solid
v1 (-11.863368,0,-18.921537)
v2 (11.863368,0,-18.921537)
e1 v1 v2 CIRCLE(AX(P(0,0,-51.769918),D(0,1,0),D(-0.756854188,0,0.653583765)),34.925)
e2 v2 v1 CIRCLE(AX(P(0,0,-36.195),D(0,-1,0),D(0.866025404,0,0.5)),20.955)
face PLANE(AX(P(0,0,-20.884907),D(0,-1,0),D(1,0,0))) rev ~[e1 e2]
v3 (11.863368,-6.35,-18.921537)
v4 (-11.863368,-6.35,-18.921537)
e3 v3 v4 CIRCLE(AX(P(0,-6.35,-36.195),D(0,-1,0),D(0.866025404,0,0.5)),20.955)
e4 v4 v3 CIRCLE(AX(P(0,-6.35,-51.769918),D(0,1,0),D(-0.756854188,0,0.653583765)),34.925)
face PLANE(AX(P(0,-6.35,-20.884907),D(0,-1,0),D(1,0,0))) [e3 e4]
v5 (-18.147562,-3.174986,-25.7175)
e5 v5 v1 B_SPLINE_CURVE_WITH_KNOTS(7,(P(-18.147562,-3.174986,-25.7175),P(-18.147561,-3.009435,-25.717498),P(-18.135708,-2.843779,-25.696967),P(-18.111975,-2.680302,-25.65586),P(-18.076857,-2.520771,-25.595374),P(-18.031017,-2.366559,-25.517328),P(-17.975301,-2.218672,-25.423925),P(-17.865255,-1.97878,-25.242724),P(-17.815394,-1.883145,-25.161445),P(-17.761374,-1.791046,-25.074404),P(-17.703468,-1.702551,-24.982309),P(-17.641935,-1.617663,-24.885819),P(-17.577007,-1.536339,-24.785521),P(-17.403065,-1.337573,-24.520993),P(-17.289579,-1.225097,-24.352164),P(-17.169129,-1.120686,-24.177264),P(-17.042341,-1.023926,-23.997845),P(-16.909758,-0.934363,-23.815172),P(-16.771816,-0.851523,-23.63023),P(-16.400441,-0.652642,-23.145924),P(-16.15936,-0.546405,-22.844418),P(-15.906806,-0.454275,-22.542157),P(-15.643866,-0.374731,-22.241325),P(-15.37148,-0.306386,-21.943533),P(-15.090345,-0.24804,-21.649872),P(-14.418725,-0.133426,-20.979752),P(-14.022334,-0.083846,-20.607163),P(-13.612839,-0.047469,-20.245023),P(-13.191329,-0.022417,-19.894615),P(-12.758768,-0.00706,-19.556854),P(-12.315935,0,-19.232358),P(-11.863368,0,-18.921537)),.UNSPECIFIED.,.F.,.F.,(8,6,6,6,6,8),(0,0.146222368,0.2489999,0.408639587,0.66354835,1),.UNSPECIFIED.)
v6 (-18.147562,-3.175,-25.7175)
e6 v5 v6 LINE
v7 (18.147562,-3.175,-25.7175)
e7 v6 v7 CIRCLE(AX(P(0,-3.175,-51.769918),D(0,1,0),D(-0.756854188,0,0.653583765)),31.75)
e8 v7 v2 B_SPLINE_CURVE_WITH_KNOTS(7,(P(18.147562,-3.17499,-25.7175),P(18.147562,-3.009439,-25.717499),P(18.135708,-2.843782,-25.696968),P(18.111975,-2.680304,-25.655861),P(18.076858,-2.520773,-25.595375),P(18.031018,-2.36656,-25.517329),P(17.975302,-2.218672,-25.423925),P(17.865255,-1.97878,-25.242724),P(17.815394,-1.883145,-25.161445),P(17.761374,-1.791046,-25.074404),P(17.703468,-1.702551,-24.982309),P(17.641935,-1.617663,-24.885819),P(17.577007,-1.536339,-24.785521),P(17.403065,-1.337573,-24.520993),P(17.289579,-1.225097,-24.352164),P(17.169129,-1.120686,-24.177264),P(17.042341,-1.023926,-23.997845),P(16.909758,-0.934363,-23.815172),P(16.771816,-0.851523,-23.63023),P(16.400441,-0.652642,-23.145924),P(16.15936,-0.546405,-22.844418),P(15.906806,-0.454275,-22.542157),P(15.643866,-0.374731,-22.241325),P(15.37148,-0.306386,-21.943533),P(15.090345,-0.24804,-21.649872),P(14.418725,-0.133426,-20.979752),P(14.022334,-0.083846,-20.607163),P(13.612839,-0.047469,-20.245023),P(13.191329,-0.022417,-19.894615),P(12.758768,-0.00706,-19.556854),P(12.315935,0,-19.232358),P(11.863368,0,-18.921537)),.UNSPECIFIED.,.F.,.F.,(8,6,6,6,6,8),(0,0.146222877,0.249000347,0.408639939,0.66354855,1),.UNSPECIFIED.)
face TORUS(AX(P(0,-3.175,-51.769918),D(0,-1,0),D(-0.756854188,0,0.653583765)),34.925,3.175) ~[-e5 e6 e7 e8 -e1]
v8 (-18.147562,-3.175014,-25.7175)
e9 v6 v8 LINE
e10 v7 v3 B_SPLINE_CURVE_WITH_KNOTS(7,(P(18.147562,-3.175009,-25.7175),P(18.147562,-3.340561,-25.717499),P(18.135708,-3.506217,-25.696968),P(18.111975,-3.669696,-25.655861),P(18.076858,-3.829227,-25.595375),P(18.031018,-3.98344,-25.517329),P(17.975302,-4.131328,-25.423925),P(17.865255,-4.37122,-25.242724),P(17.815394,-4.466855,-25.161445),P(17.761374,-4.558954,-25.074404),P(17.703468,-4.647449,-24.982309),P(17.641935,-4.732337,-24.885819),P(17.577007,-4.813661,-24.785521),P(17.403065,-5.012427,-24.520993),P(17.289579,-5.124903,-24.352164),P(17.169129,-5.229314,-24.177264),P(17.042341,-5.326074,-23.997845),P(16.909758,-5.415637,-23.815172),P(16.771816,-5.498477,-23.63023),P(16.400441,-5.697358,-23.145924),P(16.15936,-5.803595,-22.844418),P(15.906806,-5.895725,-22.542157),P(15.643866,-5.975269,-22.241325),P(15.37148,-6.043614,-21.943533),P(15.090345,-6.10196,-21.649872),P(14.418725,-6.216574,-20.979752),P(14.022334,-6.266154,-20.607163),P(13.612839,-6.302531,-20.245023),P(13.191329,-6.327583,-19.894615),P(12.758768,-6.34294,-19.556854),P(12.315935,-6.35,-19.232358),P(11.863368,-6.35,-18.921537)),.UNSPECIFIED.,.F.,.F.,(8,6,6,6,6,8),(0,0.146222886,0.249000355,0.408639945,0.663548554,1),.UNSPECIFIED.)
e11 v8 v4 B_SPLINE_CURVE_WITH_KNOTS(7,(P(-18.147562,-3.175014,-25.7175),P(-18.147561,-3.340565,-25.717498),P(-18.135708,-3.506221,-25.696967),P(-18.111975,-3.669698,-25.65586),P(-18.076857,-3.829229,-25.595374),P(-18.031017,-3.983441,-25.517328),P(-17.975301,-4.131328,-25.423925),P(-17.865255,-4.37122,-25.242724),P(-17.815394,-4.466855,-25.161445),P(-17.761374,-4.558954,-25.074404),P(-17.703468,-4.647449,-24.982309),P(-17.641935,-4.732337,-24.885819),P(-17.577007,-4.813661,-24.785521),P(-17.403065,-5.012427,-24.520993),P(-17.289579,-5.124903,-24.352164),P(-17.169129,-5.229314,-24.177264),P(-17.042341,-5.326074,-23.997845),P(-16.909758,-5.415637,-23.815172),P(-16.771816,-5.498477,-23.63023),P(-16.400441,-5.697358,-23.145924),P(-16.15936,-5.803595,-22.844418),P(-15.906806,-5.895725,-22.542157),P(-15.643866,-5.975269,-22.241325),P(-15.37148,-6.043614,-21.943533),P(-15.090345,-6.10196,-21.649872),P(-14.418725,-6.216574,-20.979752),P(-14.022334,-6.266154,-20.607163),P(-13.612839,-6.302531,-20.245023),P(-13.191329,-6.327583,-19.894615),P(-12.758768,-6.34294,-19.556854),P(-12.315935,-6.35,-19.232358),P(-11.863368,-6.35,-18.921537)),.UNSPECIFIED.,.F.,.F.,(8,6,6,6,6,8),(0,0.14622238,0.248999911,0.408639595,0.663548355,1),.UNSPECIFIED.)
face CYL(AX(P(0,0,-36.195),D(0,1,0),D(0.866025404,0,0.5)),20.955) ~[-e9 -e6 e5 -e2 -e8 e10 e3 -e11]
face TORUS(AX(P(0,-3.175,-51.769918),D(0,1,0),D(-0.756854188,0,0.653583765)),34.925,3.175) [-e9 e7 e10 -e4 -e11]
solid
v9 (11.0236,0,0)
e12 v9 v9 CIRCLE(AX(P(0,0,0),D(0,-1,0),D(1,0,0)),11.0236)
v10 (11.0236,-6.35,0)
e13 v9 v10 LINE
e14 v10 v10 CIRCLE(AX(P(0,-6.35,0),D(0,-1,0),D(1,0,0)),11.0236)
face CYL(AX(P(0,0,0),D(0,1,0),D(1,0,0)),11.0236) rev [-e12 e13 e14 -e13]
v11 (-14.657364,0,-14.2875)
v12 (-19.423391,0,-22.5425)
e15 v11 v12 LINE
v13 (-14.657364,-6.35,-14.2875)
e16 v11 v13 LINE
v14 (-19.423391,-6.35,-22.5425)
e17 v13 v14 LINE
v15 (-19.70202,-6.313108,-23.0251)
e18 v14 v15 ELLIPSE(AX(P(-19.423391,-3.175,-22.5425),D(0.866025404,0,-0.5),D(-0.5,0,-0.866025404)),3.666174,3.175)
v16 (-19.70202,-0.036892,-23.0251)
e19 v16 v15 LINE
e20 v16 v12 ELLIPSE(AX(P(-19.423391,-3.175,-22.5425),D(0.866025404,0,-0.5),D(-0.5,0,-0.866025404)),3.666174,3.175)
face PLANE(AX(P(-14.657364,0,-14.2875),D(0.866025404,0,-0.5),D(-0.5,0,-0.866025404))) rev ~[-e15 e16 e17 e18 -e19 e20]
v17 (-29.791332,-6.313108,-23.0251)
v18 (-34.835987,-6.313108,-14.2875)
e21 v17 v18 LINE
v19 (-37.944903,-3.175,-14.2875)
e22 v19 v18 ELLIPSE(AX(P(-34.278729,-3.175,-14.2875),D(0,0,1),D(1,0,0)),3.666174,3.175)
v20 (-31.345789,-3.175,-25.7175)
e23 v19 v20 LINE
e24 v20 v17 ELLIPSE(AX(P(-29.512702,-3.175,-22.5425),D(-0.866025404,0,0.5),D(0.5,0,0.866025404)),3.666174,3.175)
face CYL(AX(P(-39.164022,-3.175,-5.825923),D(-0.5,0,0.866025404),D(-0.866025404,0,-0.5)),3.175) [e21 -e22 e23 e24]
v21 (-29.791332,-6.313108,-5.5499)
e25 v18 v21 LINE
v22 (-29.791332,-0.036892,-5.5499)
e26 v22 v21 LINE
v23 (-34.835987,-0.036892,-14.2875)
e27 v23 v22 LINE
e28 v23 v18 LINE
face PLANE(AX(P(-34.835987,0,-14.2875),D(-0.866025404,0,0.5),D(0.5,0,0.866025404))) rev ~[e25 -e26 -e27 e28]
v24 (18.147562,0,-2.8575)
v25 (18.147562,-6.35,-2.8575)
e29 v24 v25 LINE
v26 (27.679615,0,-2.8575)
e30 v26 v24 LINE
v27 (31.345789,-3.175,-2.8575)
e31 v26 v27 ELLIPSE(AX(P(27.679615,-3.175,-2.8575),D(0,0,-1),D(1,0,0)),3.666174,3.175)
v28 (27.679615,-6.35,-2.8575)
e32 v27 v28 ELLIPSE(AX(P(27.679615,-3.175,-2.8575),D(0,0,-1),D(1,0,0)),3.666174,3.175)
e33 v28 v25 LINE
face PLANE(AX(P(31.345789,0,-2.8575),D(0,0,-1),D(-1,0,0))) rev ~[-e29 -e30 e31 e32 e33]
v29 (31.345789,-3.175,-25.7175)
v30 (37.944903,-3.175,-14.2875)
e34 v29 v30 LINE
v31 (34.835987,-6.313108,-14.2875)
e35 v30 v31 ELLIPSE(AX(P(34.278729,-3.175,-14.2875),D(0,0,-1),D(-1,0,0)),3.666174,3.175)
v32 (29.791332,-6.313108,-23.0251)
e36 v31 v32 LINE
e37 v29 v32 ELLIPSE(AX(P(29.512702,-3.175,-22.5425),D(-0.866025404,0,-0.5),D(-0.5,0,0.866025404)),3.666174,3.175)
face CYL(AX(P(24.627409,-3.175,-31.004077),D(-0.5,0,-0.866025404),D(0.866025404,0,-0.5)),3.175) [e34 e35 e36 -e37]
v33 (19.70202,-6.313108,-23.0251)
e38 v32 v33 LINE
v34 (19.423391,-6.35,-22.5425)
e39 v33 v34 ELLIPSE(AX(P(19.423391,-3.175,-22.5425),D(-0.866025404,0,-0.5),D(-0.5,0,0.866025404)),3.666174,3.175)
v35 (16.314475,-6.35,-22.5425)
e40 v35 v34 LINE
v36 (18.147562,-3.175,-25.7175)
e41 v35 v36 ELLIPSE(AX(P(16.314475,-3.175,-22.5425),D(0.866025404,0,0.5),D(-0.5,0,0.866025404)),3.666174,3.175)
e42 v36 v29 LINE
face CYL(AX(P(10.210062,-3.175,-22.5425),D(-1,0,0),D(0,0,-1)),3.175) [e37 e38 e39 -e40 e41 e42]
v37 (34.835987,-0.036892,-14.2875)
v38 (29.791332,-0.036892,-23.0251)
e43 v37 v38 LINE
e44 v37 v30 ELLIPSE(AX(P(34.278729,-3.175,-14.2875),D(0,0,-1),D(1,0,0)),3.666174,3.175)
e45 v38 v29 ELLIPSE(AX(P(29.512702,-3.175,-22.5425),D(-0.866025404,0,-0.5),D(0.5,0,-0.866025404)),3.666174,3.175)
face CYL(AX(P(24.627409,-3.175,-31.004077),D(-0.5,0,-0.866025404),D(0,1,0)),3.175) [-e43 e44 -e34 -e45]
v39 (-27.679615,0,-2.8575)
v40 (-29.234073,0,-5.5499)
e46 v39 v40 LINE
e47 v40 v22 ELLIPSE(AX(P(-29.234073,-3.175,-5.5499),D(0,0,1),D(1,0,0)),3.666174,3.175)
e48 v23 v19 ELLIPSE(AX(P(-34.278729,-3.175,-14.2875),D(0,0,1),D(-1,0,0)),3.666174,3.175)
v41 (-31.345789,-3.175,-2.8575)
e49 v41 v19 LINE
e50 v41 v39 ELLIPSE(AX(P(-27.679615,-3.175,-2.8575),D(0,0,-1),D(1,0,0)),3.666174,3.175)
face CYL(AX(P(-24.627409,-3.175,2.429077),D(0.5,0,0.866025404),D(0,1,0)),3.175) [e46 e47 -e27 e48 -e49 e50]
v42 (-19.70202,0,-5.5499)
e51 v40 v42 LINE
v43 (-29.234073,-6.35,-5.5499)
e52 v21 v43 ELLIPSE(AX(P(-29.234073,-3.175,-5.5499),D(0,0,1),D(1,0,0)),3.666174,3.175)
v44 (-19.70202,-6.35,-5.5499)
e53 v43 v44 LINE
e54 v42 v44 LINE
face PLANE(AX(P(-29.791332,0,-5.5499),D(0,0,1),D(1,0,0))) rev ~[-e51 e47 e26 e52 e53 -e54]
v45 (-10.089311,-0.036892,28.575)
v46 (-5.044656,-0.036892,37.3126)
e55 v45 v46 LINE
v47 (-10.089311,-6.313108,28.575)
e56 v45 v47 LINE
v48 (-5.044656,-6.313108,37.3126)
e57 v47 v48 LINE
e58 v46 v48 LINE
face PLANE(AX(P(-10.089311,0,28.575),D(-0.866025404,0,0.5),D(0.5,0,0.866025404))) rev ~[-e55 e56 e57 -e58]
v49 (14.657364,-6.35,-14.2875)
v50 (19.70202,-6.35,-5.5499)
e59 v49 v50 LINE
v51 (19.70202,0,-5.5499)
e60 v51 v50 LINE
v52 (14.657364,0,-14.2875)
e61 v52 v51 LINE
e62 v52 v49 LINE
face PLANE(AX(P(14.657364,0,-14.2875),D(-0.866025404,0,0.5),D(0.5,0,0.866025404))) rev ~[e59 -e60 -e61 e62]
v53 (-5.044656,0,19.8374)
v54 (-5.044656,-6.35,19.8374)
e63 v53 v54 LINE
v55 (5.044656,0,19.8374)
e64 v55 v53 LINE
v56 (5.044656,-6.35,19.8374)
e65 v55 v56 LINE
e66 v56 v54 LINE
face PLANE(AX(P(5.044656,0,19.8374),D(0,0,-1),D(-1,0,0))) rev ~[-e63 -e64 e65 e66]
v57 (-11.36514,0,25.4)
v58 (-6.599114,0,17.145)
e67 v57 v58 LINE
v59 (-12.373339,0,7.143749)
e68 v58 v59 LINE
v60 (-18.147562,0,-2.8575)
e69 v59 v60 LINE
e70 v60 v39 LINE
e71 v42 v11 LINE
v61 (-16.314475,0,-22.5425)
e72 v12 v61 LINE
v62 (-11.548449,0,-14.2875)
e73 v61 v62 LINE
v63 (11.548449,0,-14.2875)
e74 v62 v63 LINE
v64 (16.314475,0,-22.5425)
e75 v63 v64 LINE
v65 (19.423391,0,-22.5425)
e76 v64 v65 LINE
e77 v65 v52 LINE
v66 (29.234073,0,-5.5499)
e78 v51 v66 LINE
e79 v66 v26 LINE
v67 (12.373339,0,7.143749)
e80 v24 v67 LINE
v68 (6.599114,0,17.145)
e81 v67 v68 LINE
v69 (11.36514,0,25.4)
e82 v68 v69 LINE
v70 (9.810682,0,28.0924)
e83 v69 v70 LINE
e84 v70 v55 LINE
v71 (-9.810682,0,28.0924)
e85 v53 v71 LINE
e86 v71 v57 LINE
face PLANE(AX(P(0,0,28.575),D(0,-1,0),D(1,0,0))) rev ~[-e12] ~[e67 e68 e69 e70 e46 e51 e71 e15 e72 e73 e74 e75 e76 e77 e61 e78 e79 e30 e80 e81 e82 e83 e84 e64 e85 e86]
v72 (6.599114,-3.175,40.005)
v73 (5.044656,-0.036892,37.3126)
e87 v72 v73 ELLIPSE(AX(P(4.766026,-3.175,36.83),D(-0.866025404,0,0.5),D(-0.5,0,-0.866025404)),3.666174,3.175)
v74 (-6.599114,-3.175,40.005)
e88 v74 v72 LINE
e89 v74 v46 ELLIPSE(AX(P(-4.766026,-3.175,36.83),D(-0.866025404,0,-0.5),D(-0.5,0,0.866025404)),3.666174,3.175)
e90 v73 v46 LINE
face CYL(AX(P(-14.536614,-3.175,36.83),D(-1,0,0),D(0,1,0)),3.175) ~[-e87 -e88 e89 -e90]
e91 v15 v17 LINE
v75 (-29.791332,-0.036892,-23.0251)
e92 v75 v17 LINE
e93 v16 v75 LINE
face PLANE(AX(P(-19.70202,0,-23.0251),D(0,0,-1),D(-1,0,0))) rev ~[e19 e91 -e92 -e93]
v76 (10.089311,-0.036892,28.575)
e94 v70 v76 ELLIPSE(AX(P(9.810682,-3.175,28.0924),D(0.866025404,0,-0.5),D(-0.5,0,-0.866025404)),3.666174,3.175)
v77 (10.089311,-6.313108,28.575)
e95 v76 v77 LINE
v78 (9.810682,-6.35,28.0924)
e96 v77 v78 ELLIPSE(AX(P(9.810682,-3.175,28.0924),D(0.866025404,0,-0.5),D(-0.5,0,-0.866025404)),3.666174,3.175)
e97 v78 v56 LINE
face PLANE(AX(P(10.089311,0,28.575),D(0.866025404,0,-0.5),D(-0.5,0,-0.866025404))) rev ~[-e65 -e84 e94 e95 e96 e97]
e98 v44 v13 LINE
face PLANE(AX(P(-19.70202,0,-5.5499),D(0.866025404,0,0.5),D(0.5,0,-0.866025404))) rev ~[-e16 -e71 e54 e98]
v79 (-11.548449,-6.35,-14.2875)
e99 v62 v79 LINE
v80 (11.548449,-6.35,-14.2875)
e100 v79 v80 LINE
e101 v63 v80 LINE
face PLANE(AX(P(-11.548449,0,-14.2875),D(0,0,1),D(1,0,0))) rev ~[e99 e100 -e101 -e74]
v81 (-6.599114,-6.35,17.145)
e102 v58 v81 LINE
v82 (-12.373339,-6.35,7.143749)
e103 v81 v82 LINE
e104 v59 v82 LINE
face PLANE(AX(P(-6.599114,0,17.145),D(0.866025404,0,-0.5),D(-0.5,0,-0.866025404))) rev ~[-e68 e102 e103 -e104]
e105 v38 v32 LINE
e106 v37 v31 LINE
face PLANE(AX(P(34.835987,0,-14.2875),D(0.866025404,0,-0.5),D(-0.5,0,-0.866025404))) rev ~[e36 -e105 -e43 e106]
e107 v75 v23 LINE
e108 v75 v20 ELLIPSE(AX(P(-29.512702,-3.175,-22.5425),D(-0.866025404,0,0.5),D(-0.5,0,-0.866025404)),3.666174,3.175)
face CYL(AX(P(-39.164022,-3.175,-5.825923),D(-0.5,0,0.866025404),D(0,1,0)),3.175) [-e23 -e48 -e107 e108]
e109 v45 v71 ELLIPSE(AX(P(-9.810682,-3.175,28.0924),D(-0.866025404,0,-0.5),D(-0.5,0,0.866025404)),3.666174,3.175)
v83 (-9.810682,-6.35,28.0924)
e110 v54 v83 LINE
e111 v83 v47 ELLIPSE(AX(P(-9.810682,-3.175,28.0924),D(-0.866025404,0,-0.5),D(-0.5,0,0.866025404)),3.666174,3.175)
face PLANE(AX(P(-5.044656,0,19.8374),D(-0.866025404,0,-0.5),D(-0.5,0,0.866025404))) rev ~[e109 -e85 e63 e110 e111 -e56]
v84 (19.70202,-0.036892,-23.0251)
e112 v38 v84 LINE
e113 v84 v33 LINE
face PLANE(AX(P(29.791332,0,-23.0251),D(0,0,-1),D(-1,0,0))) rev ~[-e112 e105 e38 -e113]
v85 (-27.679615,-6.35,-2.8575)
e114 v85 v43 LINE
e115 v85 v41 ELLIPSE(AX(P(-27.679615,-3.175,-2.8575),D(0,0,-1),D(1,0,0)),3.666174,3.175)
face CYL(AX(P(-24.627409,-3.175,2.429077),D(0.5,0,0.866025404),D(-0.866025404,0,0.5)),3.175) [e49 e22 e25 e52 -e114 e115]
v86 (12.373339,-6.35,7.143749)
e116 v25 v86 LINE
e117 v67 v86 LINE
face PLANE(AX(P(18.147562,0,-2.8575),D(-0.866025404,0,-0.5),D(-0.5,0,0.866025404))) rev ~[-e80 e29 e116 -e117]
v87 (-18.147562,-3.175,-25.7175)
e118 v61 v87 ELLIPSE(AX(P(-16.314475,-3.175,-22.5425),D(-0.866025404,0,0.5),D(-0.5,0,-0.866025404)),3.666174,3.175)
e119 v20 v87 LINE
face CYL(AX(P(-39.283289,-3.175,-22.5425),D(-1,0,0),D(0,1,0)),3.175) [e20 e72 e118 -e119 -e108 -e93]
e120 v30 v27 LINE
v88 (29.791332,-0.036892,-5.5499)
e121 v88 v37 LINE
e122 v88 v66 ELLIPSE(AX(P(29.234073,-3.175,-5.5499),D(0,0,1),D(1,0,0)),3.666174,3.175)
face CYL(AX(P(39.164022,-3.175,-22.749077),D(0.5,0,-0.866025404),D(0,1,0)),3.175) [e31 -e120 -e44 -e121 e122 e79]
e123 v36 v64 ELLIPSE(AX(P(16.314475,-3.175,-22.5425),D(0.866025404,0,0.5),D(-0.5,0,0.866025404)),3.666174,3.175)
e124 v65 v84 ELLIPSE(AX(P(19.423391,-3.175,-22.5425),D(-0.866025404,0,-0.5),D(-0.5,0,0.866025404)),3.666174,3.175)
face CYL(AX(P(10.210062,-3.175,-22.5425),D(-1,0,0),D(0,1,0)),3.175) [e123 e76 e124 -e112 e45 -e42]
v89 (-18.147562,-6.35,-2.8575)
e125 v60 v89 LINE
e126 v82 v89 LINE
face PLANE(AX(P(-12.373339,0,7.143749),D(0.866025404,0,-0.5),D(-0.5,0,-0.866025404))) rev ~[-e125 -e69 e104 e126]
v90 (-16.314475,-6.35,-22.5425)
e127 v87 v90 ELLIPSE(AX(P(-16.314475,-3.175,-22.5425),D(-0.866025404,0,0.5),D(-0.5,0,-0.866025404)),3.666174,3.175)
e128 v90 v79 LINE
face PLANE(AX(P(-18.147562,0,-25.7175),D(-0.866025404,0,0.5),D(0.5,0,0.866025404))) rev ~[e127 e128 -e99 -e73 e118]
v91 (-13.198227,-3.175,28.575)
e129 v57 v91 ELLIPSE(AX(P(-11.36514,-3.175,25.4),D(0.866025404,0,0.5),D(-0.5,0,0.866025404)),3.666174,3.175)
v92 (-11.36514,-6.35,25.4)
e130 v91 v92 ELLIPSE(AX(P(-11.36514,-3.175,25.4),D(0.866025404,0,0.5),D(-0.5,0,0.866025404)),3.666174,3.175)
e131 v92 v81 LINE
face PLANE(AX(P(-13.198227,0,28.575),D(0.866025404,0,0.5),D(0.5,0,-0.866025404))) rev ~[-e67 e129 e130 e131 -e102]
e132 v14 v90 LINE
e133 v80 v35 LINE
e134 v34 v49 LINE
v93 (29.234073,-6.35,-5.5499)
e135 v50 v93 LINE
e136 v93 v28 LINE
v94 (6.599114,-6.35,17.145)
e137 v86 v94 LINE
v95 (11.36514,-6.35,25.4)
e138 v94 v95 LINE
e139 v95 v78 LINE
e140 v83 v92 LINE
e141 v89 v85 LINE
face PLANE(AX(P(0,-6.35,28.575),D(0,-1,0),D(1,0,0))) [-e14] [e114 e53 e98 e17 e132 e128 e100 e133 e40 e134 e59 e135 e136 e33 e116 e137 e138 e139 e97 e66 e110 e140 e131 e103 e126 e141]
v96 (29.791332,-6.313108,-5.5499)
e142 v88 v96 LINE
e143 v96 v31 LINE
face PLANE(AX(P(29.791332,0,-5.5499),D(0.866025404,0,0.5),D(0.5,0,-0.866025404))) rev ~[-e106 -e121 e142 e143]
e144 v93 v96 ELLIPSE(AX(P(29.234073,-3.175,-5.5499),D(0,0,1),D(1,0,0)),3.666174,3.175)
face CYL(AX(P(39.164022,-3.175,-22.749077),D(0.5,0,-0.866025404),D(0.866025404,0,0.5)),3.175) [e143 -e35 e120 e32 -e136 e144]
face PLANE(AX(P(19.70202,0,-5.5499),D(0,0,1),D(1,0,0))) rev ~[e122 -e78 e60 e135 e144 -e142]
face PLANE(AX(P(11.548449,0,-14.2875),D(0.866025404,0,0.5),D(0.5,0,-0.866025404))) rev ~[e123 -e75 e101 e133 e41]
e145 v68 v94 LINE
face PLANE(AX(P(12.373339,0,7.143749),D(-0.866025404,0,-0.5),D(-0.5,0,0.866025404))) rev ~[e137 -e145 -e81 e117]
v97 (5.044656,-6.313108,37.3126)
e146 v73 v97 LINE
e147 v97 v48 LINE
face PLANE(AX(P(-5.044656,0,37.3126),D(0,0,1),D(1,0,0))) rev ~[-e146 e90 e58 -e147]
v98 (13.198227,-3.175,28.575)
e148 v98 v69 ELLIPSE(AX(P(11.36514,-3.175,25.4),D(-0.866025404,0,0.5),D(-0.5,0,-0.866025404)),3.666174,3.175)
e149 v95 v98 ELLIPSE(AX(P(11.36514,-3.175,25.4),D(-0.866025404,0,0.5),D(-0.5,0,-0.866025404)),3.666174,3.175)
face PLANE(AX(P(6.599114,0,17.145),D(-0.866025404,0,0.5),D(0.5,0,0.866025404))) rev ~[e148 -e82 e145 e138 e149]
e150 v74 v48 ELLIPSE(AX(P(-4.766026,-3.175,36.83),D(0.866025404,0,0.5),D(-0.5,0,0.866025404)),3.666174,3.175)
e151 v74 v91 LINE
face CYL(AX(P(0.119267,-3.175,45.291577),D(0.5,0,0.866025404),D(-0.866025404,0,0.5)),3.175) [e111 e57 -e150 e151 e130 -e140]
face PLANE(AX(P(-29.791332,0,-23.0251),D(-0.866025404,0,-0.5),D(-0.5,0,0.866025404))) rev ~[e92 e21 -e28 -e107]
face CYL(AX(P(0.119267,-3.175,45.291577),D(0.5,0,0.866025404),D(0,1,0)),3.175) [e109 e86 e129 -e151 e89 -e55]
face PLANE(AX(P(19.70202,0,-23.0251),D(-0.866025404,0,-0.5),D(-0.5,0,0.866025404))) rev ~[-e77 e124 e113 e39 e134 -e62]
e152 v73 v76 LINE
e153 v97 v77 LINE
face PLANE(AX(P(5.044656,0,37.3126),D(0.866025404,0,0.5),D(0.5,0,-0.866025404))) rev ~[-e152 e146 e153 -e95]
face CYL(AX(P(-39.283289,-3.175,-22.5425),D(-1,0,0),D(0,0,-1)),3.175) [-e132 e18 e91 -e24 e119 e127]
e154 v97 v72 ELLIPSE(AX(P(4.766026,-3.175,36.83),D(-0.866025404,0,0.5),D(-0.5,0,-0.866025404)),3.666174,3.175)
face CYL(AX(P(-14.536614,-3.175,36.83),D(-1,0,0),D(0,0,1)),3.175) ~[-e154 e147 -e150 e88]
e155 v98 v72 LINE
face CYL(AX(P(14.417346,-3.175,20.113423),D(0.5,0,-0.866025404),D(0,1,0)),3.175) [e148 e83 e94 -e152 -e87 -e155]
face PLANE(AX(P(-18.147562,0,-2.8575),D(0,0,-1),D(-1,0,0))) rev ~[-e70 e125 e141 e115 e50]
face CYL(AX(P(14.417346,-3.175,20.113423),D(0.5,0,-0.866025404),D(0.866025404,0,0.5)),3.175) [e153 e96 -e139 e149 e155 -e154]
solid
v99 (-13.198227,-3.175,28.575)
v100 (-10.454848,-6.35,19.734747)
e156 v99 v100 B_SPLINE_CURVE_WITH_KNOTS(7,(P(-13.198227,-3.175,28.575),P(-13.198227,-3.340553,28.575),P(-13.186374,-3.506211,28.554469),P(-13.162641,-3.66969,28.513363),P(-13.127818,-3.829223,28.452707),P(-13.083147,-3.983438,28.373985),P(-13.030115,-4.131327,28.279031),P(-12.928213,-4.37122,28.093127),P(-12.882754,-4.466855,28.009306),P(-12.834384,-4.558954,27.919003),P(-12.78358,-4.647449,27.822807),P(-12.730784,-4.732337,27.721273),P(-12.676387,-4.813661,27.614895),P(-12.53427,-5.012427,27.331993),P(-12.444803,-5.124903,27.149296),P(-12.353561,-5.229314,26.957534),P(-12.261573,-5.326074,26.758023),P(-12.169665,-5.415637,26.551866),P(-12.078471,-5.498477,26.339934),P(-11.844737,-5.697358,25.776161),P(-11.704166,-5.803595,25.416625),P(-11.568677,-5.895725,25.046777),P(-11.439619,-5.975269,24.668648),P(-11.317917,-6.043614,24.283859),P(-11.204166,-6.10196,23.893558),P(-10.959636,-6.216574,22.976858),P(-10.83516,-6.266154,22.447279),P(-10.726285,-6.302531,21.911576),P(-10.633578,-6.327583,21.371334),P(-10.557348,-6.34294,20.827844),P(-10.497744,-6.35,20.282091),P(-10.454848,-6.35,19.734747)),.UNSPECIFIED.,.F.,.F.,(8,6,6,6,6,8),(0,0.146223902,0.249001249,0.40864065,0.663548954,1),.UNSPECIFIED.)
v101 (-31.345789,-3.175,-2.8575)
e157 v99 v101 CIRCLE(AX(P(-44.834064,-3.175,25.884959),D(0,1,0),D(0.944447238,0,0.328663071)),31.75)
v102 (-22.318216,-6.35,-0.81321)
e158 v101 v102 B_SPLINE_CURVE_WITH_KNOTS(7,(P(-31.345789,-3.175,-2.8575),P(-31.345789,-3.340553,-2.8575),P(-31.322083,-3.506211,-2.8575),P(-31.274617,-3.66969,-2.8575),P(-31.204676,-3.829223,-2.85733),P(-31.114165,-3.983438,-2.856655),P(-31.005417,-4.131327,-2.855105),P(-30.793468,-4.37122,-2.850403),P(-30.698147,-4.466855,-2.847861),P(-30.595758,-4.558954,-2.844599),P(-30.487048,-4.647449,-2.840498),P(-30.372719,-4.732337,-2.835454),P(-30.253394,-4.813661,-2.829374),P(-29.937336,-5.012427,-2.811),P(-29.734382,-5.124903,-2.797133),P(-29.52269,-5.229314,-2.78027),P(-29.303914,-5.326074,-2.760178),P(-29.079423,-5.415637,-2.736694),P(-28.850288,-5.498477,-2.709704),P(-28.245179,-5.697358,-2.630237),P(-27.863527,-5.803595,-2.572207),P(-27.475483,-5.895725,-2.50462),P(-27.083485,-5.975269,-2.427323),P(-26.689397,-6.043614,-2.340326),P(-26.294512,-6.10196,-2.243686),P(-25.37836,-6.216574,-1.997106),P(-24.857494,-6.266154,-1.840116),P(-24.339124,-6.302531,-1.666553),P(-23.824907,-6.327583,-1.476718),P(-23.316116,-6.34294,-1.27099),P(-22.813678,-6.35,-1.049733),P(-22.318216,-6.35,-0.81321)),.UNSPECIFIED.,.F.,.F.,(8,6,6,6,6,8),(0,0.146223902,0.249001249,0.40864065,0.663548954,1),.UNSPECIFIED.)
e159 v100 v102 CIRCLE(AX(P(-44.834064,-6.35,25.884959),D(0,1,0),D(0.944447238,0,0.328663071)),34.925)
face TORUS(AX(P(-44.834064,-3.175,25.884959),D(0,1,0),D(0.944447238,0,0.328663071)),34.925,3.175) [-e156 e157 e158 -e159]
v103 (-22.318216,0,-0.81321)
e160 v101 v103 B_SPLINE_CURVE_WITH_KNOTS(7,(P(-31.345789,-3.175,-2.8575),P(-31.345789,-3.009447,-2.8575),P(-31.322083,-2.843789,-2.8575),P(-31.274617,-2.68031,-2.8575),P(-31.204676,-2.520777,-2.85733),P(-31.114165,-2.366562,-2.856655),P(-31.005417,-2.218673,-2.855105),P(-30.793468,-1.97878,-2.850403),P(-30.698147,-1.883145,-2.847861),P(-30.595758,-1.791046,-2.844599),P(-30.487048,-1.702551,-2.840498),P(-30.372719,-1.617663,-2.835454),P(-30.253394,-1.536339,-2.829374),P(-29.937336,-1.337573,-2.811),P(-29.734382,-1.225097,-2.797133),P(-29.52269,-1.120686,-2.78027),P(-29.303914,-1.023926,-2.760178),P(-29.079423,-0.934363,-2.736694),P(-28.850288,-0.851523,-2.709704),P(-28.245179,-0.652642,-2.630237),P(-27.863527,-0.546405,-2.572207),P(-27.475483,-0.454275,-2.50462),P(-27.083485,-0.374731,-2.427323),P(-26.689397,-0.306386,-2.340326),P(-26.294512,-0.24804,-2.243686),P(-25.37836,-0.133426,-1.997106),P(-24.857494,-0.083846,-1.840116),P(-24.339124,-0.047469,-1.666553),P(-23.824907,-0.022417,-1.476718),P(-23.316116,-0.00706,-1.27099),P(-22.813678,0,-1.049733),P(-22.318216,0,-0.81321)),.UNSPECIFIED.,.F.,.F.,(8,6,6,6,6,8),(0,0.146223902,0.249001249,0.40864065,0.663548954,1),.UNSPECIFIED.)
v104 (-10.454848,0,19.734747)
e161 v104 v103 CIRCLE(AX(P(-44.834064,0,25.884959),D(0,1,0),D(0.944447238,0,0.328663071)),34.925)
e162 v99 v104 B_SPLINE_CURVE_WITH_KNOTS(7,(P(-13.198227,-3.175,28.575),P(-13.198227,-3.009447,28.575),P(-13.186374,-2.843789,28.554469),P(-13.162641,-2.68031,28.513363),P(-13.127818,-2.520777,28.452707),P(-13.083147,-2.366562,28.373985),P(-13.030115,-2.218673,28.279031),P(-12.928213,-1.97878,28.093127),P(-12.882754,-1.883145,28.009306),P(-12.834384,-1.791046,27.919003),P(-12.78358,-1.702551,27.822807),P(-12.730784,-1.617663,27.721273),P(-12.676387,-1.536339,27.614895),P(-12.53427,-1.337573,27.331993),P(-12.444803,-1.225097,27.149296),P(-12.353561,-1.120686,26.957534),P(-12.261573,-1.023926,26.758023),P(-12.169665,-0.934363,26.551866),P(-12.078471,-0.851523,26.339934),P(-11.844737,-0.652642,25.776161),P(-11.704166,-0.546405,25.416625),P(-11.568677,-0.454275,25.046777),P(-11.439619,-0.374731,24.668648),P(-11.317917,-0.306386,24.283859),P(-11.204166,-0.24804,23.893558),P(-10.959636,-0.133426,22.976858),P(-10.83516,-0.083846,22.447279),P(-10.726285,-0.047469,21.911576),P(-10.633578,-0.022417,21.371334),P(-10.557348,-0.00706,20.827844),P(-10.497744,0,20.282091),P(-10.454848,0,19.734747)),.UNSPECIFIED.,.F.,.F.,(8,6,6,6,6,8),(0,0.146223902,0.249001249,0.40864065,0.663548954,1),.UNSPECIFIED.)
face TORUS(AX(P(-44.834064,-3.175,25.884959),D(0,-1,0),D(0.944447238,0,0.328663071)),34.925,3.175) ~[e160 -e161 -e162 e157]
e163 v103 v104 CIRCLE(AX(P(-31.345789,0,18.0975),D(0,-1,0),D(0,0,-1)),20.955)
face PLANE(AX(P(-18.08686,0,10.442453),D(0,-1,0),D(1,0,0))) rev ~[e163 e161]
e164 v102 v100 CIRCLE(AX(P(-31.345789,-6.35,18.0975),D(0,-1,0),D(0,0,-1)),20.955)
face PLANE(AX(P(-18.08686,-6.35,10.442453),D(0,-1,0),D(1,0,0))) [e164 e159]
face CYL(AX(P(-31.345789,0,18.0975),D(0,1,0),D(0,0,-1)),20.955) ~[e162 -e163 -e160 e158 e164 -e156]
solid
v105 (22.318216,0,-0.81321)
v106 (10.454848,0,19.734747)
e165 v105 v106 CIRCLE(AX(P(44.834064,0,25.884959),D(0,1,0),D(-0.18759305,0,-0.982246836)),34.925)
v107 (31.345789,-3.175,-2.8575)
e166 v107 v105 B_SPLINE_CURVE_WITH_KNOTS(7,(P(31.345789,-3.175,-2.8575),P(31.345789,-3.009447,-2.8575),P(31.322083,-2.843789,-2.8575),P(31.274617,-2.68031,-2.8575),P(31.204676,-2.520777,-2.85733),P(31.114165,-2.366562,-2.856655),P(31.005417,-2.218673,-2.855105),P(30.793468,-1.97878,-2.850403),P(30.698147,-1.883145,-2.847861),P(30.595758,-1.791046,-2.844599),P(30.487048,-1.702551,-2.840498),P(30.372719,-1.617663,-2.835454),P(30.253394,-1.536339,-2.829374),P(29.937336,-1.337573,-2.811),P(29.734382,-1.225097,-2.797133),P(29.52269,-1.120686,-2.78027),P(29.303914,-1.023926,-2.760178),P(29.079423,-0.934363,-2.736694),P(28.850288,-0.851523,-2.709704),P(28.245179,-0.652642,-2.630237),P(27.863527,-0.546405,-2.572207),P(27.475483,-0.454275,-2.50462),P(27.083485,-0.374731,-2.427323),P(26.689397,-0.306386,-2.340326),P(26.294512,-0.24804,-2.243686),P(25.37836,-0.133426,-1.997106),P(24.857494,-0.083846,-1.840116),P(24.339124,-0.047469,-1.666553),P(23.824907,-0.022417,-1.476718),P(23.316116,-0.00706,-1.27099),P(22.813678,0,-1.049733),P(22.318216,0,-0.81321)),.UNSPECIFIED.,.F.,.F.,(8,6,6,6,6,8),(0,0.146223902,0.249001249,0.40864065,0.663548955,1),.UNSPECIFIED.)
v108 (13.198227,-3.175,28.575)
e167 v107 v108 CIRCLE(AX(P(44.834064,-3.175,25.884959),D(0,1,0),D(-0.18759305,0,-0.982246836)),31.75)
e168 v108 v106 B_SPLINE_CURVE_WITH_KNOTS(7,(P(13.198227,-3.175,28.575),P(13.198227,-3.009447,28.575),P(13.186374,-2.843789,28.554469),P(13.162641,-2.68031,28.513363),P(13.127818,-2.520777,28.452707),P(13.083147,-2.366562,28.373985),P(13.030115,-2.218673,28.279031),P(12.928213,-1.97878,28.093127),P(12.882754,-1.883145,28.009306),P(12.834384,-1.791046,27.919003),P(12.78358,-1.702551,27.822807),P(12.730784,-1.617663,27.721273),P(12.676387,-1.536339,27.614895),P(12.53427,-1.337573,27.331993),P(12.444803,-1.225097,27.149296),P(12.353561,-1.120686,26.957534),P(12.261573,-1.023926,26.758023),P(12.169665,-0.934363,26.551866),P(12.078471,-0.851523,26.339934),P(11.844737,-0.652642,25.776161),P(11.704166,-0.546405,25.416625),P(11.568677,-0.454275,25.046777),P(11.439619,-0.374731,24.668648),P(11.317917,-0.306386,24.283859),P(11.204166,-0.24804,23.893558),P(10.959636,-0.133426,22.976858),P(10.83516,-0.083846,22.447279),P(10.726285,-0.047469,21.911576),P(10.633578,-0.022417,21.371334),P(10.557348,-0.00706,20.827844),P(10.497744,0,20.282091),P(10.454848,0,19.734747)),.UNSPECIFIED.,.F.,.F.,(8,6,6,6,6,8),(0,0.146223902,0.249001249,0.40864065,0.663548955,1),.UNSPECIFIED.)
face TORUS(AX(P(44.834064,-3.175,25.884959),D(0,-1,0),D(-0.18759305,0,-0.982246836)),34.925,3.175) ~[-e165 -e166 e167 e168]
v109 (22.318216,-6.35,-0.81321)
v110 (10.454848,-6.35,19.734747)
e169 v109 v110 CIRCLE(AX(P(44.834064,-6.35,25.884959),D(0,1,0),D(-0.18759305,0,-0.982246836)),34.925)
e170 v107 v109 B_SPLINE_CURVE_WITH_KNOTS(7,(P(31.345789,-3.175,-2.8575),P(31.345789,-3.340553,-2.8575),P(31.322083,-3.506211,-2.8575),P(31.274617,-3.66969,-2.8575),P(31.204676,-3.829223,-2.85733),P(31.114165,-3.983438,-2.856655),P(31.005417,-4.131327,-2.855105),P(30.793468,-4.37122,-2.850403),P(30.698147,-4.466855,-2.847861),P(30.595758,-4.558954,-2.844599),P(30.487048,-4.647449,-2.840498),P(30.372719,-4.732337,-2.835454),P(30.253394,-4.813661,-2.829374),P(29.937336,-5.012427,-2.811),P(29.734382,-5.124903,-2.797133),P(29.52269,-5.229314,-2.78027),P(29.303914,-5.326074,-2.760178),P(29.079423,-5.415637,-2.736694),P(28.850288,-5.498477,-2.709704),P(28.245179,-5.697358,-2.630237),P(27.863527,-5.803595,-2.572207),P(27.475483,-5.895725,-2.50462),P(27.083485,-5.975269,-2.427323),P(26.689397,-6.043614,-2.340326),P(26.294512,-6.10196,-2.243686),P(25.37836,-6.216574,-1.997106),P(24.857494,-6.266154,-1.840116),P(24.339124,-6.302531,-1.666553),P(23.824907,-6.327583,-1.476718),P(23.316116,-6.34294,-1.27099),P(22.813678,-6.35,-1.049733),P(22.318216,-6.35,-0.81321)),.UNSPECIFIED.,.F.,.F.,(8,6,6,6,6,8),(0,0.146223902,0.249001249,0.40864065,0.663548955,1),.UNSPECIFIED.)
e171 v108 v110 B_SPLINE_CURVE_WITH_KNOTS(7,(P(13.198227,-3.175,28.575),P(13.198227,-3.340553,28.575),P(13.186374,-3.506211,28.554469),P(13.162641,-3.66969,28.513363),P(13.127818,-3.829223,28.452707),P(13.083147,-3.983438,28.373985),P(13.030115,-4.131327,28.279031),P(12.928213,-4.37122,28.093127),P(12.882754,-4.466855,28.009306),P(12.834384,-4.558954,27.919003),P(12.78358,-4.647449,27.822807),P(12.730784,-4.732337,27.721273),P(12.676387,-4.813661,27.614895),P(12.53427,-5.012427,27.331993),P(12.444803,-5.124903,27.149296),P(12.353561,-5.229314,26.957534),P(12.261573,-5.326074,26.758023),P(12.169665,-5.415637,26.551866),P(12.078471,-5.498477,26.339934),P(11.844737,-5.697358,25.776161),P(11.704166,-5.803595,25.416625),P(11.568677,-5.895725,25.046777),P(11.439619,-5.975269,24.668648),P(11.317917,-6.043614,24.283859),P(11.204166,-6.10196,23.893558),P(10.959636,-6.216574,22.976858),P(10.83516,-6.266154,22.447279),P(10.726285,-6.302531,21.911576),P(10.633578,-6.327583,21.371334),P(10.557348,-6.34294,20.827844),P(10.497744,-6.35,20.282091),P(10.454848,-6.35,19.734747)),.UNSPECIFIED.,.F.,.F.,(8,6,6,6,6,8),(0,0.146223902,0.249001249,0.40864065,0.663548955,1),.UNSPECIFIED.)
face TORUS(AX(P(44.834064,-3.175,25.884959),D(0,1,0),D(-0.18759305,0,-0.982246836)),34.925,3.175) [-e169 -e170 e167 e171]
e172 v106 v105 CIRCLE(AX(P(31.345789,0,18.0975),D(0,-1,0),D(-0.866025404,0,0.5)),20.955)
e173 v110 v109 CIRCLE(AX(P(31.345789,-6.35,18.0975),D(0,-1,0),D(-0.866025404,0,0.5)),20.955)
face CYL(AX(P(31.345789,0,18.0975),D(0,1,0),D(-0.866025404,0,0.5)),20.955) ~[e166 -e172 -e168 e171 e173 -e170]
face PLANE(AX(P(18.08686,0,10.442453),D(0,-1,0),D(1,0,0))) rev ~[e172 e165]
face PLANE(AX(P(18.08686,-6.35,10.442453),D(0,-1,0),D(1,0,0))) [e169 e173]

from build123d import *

# Parameters (mm, degrees)
F1_DEPTH      = 6.35
F0_R          = 11.0236
F2_T1_DEPTH   = 29.0732271537
F2_T3_DEPTH   = 29.0732271537
F2_T5_DEPTH   = 29.0732271537
F2_T7_DEPTH   = 29.0732271537
F2_T9_DEPTH   = 29.0732271537
F2_T11_DEPTH  = 29.0732271537
F2_T13_DEPTH  = 29.0732271537
F2_T15_DEPTH  = 29.0732271537
F2_T17_DEPTH  = 29.0732271537
F2_2_T2_ANGLE = 98.3752988321
F2_3_T2_ANGLE = 98.3752988321
F2_4_T2_ANGLE = 98.3752988321
F3_T1_DEPTH   = 29.0732271537
F3_T3_DEPTH   = 29.0732271537
F3_T5_DEPTH   = 29.0732271537
F3_T7_DEPTH   = 29.0732271537
F3_T9_DEPTH   = 29.0732271537
F3_T11_DEPTH  = 29.0732271537
F3_T13_DEPTH  = 29.0732271537
F3_T15_DEPTH  = 29.0732271537
F3_T17_DEPTH  = 29.0732271537
F3_2_T2_ANGLE = 98.3752988321
F3_3_T2_ANGLE = 98.3752988321
F3_4_T2_ANGLE = 98.3752988321


# Not quite as in the source:
# - a fillet or chamfer that OpenCascade refuses, or shapes differently, is made with other operations: its cross-section is extruded or revolved along the edge and cut away or added


with BuildPart() as f1:
    # F0 (on Front) → F1 (new body)
    with BuildSketch(Plane.XZ):
        with BuildLine():
            ThreePointArc((-31.34578949, -2.8575), (-13.1982271537, 7.62), (-13.1982271537, 28.575))
            ThreePointArc((-13.1982271537, 28.575), (-17.3377575298, 10.009958977), (-31.34578949, -2.8575))
        make_face()
    extrude(amount=F1_DEPTH)

    # F2#2: fillet of radius 3.175 on 1 edges, made by hand

    # F2_2_s1 → F2_2_t2 (revolve, cut)
    with BuildSketch(Plane(origin=(-12.8777682078, 0, 37.0055953838), x_dir=(0, 1, 0), z_dir=(-0.3286630709, 0, 0.9444472382))):
        with BuildLine():
            ThreePointArc((-3.175, 2.0859779117), (-5.4200640303, 1.156041942), (-6.35, -1.0890220883))
            Line((-6.35, -1.0890220883), (-6.35, 2.0859779117))
            Line((-6.35, 2.0859779117), (-3.175, 2.0859779117))
        make_face()
    revolve(axis=Axis((-44.8340641, -6.35, 25.884958977), (0, 1, 0)), revolution_arc=F2_2_T2_ANGLE, mode=Mode.SUBTRACT)

    # F3#4: fillet of radius 3.175 on 1 edges, made by hand

    # F3_4_s1 → F3_4_t2 (revolve, cut)
    with BuildSketch(Plane(origin=(-12.8777682078, 0, 37.0055953838), x_dir=(0, 1, 0), z_dir=(-0.3286630709, 0, 0.9444472382))):
        with BuildLine():
            ThreePointArc((-3.175, 2.0859779117), (-0.9299359697, 1.156041942), (0, -1.0890220883))
            Line((0, -1.0890220883), (0, 2.0859779117))
            Line((0, 2.0859779117), (-3.175, 2.0859779117))
        make_face()
    revolve(axis=Axis((-44.8340641, 0, 25.884958977), (0, 1, 0)), revolution_arc=F3_4_T2_ANGLE, mode=Mode.SUBTRACT)


with BuildPart() as f1b:
    # F0 (on Front) → F1, piece 2 (new body)
    with BuildSketch(Plane.XZ):
        with BuildLine():
            ThreePointArc((13.1982271537, 28.575), (13.1982271537, 7.62), (31.34578949, -2.8575))
            ThreePointArc((31.34578949, -2.8575), (17.3377575298, 10.009958977), (13.1982271537, 28.575))
        make_face()
    extrude(amount=F1_DEPTH)

    # F2#4: fillet of radius 3.175 on 1 edges, made by hand

    # F2_4_s1 → F2_4_t2 (revolve, cut)
    with BuildSketch(Plane(origin=(38.4866697884, 0, -7.3503232799), x_dir=(0, 1, 0), z_dir=(0.9822468363, 0, -0.1875930505))):
        with BuildLine():
            ThreePointArc((-3.175, 2.0859779117), (-5.4200640303, 1.156041942), (-6.35, -1.0890220883))
            Line((-6.35, -1.0890220883), (-6.35, 2.0859779117))
            Line((-6.35, 2.0859779117), (-3.175, 2.0859779117))
        make_face()
    revolve(axis=Axis((44.8340641, -6.35, 25.884958977), (0, 1, 0)), revolution_arc=F2_4_T2_ANGLE, mode=Mode.SUBTRACT)

    # F3#2: fillet of radius 3.175 on 1 edges, made by hand

    # F3_2_s1 → F3_2_t2 (revolve, cut)
    with BuildSketch(Plane(origin=(38.4866697884, 0, -7.3503232799), x_dir=(0, 1, 0), z_dir=(0.9822468363, 0, -0.1875930505))):
        with BuildLine():
            ThreePointArc((-3.175, 2.0859779117), (-0.9299359697, 1.156041942), (0, -1.0890220883))
            Line((0, -1.0890220883), (0, 2.0859779117))
            Line((0, 2.0859779117), (-3.175, 2.0859779117))
        make_face()
    revolve(axis=Axis((44.8340641, 0, 25.884958977), (0, 1, 0)), revolution_arc=F3_2_T2_ANGLE, mode=Mode.SUBTRACT)


with BuildPart() as f1c:
    # F0 (on Front) → F1, piece 3 (new body)
    with BuildSketch(Plane.XZ):
        with BuildLine():
            ThreePointArc((18.1475623363, -25.7175), (0, -15.24), (-18.1475623363, -25.7175))
            ThreePointArc((-18.1475623363, -25.7175), (0, -20.019917954), (18.1475623363, -25.7175))
        make_face()
    extrude(amount=F1_DEPTH)

    # F2#3: fillet of radius 3.175 on 1 edges, made by hand

    # F2_3_s1 → F2_3_t2 (revolve, cut)
    with BuildSketch(Plane(origin=(-25.6089015806, 0, -29.6552721039), x_dir=(0, 1, 0), z_dir=(-0.6535837654, 0, -0.7568541878))):
        with BuildLine():
            ThreePointArc((-3.175, 2.0859779117), (-5.4200640303, 1.156041942), (-6.35, -1.0890220883))
            Line((-6.35, -1.0890220883), (-6.35, 2.0859779117))
            Line((-6.35, 2.0859779117), (-3.175, 2.0859779117))
        make_face()
    revolve(axis=Axis((0, -6.35, -51.769917954), (0, 1, 0)), revolution_arc=F2_3_T2_ANGLE, mode=Mode.SUBTRACT)

    # F3#3: fillet of radius 3.175 on 1 edges, made by hand

    # F3_3_s1 → F3_3_t2 (revolve, cut)
    with BuildSketch(Plane(origin=(-25.6089015806, 0, -29.6552721039), x_dir=(0, 1, 0), z_dir=(-0.6535837654, 0, -0.7568541878))):
        with BuildLine():
            ThreePointArc((-3.175, 2.0859779117), (-0.9299359697, 1.156041942), (0, -1.0890220883))
            Line((0, -1.0890220883), (0, 2.0859779117))
            Line((0, 2.0859779117), (-3.175, 2.0859779117))
        make_face()
    revolve(axis=Axis((0, 0, -51.769917954), (0, 1, 0)), revolution_arc=F3_3_T2_ANGLE, mode=Mode.SUBTRACT)


with BuildPart() as f1d:
    # F0 (on Front) → F1, piece 4 (new body)
    with BuildSketch(Plane.XZ):
        Polygon((-6.5991135768, 17.145), (6.5991135768, 17.145), (13.1982271537, 28.575), (6.5991135768, 40.005), (-6.5991135768, 40.005), (-13.1982271537, 28.575), align=None)
        Polygon((10.0893114241, 28.575), (5.0446557121, 19.8374), (-5.0446557121, 19.8374), (-10.0893114241, 28.575), (-5.0446557121, 37.3126), (5.0446557121, 37.3126), align=None, mode=Mode.SUBTRACT)
        Polygon((-18.1475623363, -25.7175), (-11.5484487595, -14.2875), (-18.1475623363, -2.8575), (-31.34578949, -2.8575), (-37.9449030668, -14.2875), (-31.34578949, -25.7175), align=None)
        Polygon((-14.657364489, -14.2875), (-19.7020202011, -23.0251), (-29.7913316252, -23.0251), (-34.8359873373, -14.2875), (-29.7913316252, -5.5499), (-19.7020202011, -5.5499), align=None, mode=Mode.SUBTRACT)
        Polygon((31.34578949, -2.8575), (18.1475623363, -2.8575), (11.5484487595, -14.2875), (18.1475623363, -25.7175), (31.34578949, -25.7175), (37.9449030668, -14.2875), align=None)
        Polygon((19.7020202011, -5.5499), (29.7913316252, -5.5499), (34.8359873373, -14.2875), (29.7913316252, -23.0251), (19.7020202011, -23.0251), (14.657364489, -14.2875), align=None, mode=Mode.SUBTRACT)
        with BuildLine():
            ThreePointArc((0, -14.2875), (10.1027881362, -10.1027881362), (14.2875, 0))
            ThreePointArc((14.2875, 0), (13.8006654478, 3.6978763431), (12.3733387473, 7.1437486304))
            ThreePointArc((12.3733387473, 7.1437486304), (5.17e-08, 14.2875), (-12.3733386957, 7.1437487198))
            ThreePointArc((-12.3733386957, 7.1437487198), (-12.373337587, -7.1437506401), (0, -14.2875))
        make_face()
        Circle(F0_R, mode=Mode.SUBTRACT)
        with BuildLine():
            ThreePointArc((12.3733387473, 7.1437486304), (13.8006654478, 3.6978763431), (14.2875, 0))
            ThreePointArc((14.2875, 0), (10.1027881362, -10.1027881362), (0, -14.2875))
            Line((0, -14.2875), (11.5484487595, -14.2875))
            Line((11.5484487595, -14.2875), (18.1475623363, -2.8575))
            Line((18.1475623363, -2.8575), (12.3733387473, 7.1437486304))
        make_face()
        with BuildLine():
            Line((-11.5484487595, -14.2875), (0, -14.2875))
            ThreePointArc((0, -14.2875), (-12.373337587, -7.1437506401), (-12.3733386957, 7.1437487198))
            Line((-12.3733386957, 7.1437487198), (-18.1475623363, -2.8575))
            Line((-18.1475623363, -2.8575), (-11.5484487595, -14.2875))
        make_face()
        with BuildLine():
            ThreePointArc((-12.3733386957, 7.1437487198), (5.17e-08, 14.2875), (12.3733387473, 7.1437486304))
            Line((12.3733387473, 7.1437486304), (6.5991135768, 17.145))
            Line((6.5991135768, 17.145), (-6.5991135768, 17.145))
            Line((-6.5991135768, 17.145), (-12.3733386957, 7.1437487198))
        make_face()
    extrude(amount=F1_DEPTH)

    # F2: fillet of radius 3.175 on 9 edges, made by hand

    # F2_s2 → F2_t1 (cut)
    with BuildSketch(Plane(origin=(19.641644745, 0, 34.0203266425), x_dir=(0, 1, 0), z_dir=(-0.5, 0, -0.8660254038))):
        with BuildLine():
            ThreePointArc((-3.175, -25.7175), (-5.4200640303, -24.7875640303), (-6.35, -22.5425))
            Line((-6.35, -22.5425), (-6.35, -25.7175))
            Line((-6.35, -25.7175), (-3.175, -25.7175))
        make_face()
    extrude(amount=F2_T1_DEPTH, mode=Mode.SUBTRACT)

    # F2_s4 → F2_t3 (cut)
    with BuildSketch(Plane.YZ.offset(-14.5366135768)):
        with BuildLine():
            ThreePointArc((-3.175, 40.005), (-5.4200640303, 39.0750640303), (-6.35, 36.83))
            Line((-6.35, 36.83), (-6.35, 40.005))
            Line((-6.35, 40.005), (-3.175, 40.005))
        make_face()
    extrude(amount=F2_T3_DEPTH, mode=Mode.SUBTRACT)

    # F2_s6 → F2_t5 (cut)
    with BuildSketch(Plane(origin=(-5.1050311682, 0, 8.8421733575), x_dir=(0, 1, 0), z_dir=(-0.5, 0, 0.8660254038))):
        with BuildLine():
            ThreePointArc((-3.175, -25.7175), (-5.4200640303, -24.7875640303), (-6.35, -22.5425))
            Line((-6.35, -22.5425), (-6.35, -25.7175))
            Line((-6.35, -25.7175), (-3.175, -25.7175))
        make_face()
    extrude(amount=F2_T5_DEPTH, mode=Mode.SUBTRACT)

    # F2_s8 → F2_t7 (cut)
    with BuildSketch(Plane(origin=(-5.1050311682, 0, -8.8421733575), x_dir=(0, 1, 0), z_dir=(-0.5, 0, -0.8660254038))):
        with BuildLine():
            ThreePointArc((-3.175, -25.7175), (-5.4200640303, -24.7875640303), (-6.35, -22.5425))
            Line((-6.35, -22.5425), (-6.35, -25.7175))
            Line((-6.35, -25.7175), (-3.175, -25.7175))
        make_face()
    extrude(amount=F2_T7_DEPTH, mode=Mode.SUBTRACT)

    # F2_s10 → F2_t9 (cut)
    with BuildSketch(Plane(origin=(-7.2683067884, 0, 12.5890766425), x_dir=(0, 1, 0), z_dir=(0.5, 0, -0.8660254038))):
        with BuildLine():
            ThreePointArc((-3.175, -40.005), (-5.4200640303, -39.0750640303), (-6.35, -36.83))
            Line((-6.35, -36.83), (-6.35, -40.005))
            Line((-6.35, -40.005), (-3.175, -40.005))
        make_face()
    extrude(amount=F2_T9_DEPTH, mode=Mode.SUBTRACT)

    # F2_s12 → F2_t11 (cut)
    with BuildSketch(Plane.YZ.offset(-39.28328949)):
        with BuildLine():
            ThreePointArc((-3.175, -25.7175), (-5.4200640303, -24.7875640303), (-6.35, -22.5425))
            Line((-6.35, -22.5425), (-6.35, -25.7175))
            Line((-6.35, -25.7175), (-3.175, -25.7175))
        make_face()
    extrude(amount=F2_T11_DEPTH, mode=Mode.SUBTRACT)

    # F2_s14 → F2_t13 (cut)
    with BuildSketch(Plane.YZ.offset(10.2100623363)):
        with BuildLine():
            ThreePointArc((-3.175, -25.7175), (-5.4200640303, -24.7875640303), (-6.35, -22.5425))
            Line((-6.35, -22.5425), (-6.35, -25.7175))
            Line((-6.35, -25.7175), (-3.175, -25.7175))
        make_face()
    extrude(amount=F2_T13_DEPTH, mode=Mode.SUBTRACT)

    # F2_s16 → F2_t15 (cut)
    with BuildSketch(Plane(origin=(-7.2683067884, 0, -12.5890766425), x_dir=(0, 1, 0), z_dir=(0.5, 0, 0.8660254038))):
        with BuildLine():
            ThreePointArc((-3.175, -40.005), (-5.4200640303, -39.0750640303), (-6.35, -36.83))
            Line((-6.35, -36.83), (-6.35, -40.005))
            Line((-6.35, -40.005), (-3.175, -40.005))
        make_face()
    extrude(amount=F2_T15_DEPTH, mode=Mode.SUBTRACT)

    # F2_s18 → F2_t17 (cut)
    with BuildSketch(Plane(origin=(19.641644745, 0, -34.0203266425), x_dir=(0, 1, 0), z_dir=(-0.5, 0, 0.8660254038))):
        with BuildLine():
            ThreePointArc((-3.175, -25.7175), (-5.4200640303, -24.7875640303), (-6.35, -22.5425))
            Line((-6.35, -22.5425), (-6.35, -25.7175))
            Line((-6.35, -25.7175), (-3.175, -25.7175))
        make_face()
    extrude(amount=F2_T17_DEPTH, mode=Mode.SUBTRACT)

    # F3: fillet of radius 3.175 on 9 edges, made by hand

    # F3_s2 → F3_t1 (cut)
    with BuildSketch(Plane.YZ.offset(-14.5366135768)):
        with BuildLine():
            ThreePointArc((0, 36.83), (-0.9299359697, 39.0750640303), (-3.175, 40.005))
            Line((-3.175, 40.005), (0, 40.005))
            Line((0, 40.005), (0, 36.83))
        make_face()
    extrude(amount=F3_T1_DEPTH, mode=Mode.SUBTRACT)

    # F3_s4 → F3_t3 (cut)
    with BuildSketch(Plane(origin=(-5.1050311682, 0, 8.8421733575), x_dir=(0, 1, 0), z_dir=(-0.5, 0, 0.8660254038))):
        with BuildLine():
            ThreePointArc((0, -22.5425), (-0.9299359697, -24.7875640303), (-3.175, -25.7175))
            Line((-3.175, -25.7175), (0, -25.7175))
            Line((0, -25.7175), (0, -22.5425))
        make_face()
    extrude(amount=F3_T3_DEPTH, mode=Mode.SUBTRACT)

    # F3_s6 → F3_t5 (cut)
    with BuildSketch(Plane(origin=(19.641644745, 0, -34.0203266425), x_dir=(0, 1, 0), z_dir=(-0.5, 0, 0.8660254038))):
        with BuildLine():
            ThreePointArc((0, -22.5425), (-0.9299359697, -24.7875640303), (-3.175, -25.7175))
            Line((-3.175, -25.7175), (0, -25.7175))
            Line((0, -25.7175), (0, -22.5425))
        make_face()
    extrude(amount=F3_T5_DEPTH, mode=Mode.SUBTRACT)

    # F3_s8 → F3_t7 (cut)
    with BuildSketch(Plane(origin=(-7.2683067884, 0, -12.5890766425), x_dir=(0, 1, 0), z_dir=(0.5, 0, 0.8660254038))):
        with BuildLine():
            ThreePointArc((0, -36.83), (-0.9299359697, -39.0750640303), (-3.175, -40.005))
            Line((-3.175, -40.005), (0, -40.005))
            Line((0, -40.005), (0, -36.83))
        make_face()
    extrude(amount=F3_T7_DEPTH, mode=Mode.SUBTRACT)

    # F3_s10 → F3_t9 (cut)
    with BuildSketch(Plane.YZ.offset(10.2100623363)):
        with BuildLine():
            ThreePointArc((0, -22.5425), (-0.9299359697, -24.7875640303), (-3.175, -25.7175))
            Line((-3.175, -25.7175), (0, -25.7175))
            Line((0, -25.7175), (0, -22.5425))
        make_face()
    extrude(amount=F3_T9_DEPTH, mode=Mode.SUBTRACT)

    # F3_s12 → F3_t11 (cut)
    with BuildSketch(Plane.YZ.offset(-39.28328949)):
        with BuildLine():
            ThreePointArc((0, -22.5425), (-0.9299359697, -24.7875640303), (-3.175, -25.7175))
            Line((-3.175, -25.7175), (0, -25.7175))
            Line((0, -25.7175), (0, -22.5425))
        make_face()
    extrude(amount=F3_T11_DEPTH, mode=Mode.SUBTRACT)

    # F3_s14 → F3_t13 (cut)
    with BuildSketch(Plane(origin=(-7.2683067884, 0, 12.5890766425), x_dir=(0, 1, 0), z_dir=(0.5, 0, -0.8660254038))):
        with BuildLine():
            ThreePointArc((0, -36.83), (-0.9299359697, -39.0750640303), (-3.175, -40.005))
            Line((-3.175, -40.005), (0, -40.005))
            Line((0, -40.005), (0, -36.83))
        make_face()
    extrude(amount=F3_T13_DEPTH, mode=Mode.SUBTRACT)

    # F3_s16 → F3_t15 (cut)
    with BuildSketch(Plane(origin=(-5.1050311682, 0, -8.8421733575), x_dir=(0, 1, 0), z_dir=(-0.5, 0, -0.8660254038))):
        with BuildLine():
            ThreePointArc((0, -22.5425), (-0.9299359697, -24.7875640303), (-3.175, -25.7175))
            Line((-3.175, -25.7175), (0, -25.7175))
            Line((0, -25.7175), (0, -22.5425))
        make_face()
    extrude(amount=F3_T15_DEPTH, mode=Mode.SUBTRACT)

    # F3_s18 → F3_t17 (cut)
    with BuildSketch(Plane(origin=(19.641644745, 0, 34.0203266425), x_dir=(0, 1, 0), z_dir=(-0.5, 0, -0.8660254038))):
        with BuildLine():
            ThreePointArc((0, -22.5425), (-0.9299359697, -24.7875640303), (-3.175, -25.7175))
            Line((-3.175, -25.7175), (0, -25.7175))
            Line((0, -25.7175), (0, -22.5425))
        make_face()
    extrude(amount=F3_T17_DEPTH, mode=Mode.SUBTRACT)


solid = Compound([f1.part, f1b.part, f1c.part, f1d.part])
